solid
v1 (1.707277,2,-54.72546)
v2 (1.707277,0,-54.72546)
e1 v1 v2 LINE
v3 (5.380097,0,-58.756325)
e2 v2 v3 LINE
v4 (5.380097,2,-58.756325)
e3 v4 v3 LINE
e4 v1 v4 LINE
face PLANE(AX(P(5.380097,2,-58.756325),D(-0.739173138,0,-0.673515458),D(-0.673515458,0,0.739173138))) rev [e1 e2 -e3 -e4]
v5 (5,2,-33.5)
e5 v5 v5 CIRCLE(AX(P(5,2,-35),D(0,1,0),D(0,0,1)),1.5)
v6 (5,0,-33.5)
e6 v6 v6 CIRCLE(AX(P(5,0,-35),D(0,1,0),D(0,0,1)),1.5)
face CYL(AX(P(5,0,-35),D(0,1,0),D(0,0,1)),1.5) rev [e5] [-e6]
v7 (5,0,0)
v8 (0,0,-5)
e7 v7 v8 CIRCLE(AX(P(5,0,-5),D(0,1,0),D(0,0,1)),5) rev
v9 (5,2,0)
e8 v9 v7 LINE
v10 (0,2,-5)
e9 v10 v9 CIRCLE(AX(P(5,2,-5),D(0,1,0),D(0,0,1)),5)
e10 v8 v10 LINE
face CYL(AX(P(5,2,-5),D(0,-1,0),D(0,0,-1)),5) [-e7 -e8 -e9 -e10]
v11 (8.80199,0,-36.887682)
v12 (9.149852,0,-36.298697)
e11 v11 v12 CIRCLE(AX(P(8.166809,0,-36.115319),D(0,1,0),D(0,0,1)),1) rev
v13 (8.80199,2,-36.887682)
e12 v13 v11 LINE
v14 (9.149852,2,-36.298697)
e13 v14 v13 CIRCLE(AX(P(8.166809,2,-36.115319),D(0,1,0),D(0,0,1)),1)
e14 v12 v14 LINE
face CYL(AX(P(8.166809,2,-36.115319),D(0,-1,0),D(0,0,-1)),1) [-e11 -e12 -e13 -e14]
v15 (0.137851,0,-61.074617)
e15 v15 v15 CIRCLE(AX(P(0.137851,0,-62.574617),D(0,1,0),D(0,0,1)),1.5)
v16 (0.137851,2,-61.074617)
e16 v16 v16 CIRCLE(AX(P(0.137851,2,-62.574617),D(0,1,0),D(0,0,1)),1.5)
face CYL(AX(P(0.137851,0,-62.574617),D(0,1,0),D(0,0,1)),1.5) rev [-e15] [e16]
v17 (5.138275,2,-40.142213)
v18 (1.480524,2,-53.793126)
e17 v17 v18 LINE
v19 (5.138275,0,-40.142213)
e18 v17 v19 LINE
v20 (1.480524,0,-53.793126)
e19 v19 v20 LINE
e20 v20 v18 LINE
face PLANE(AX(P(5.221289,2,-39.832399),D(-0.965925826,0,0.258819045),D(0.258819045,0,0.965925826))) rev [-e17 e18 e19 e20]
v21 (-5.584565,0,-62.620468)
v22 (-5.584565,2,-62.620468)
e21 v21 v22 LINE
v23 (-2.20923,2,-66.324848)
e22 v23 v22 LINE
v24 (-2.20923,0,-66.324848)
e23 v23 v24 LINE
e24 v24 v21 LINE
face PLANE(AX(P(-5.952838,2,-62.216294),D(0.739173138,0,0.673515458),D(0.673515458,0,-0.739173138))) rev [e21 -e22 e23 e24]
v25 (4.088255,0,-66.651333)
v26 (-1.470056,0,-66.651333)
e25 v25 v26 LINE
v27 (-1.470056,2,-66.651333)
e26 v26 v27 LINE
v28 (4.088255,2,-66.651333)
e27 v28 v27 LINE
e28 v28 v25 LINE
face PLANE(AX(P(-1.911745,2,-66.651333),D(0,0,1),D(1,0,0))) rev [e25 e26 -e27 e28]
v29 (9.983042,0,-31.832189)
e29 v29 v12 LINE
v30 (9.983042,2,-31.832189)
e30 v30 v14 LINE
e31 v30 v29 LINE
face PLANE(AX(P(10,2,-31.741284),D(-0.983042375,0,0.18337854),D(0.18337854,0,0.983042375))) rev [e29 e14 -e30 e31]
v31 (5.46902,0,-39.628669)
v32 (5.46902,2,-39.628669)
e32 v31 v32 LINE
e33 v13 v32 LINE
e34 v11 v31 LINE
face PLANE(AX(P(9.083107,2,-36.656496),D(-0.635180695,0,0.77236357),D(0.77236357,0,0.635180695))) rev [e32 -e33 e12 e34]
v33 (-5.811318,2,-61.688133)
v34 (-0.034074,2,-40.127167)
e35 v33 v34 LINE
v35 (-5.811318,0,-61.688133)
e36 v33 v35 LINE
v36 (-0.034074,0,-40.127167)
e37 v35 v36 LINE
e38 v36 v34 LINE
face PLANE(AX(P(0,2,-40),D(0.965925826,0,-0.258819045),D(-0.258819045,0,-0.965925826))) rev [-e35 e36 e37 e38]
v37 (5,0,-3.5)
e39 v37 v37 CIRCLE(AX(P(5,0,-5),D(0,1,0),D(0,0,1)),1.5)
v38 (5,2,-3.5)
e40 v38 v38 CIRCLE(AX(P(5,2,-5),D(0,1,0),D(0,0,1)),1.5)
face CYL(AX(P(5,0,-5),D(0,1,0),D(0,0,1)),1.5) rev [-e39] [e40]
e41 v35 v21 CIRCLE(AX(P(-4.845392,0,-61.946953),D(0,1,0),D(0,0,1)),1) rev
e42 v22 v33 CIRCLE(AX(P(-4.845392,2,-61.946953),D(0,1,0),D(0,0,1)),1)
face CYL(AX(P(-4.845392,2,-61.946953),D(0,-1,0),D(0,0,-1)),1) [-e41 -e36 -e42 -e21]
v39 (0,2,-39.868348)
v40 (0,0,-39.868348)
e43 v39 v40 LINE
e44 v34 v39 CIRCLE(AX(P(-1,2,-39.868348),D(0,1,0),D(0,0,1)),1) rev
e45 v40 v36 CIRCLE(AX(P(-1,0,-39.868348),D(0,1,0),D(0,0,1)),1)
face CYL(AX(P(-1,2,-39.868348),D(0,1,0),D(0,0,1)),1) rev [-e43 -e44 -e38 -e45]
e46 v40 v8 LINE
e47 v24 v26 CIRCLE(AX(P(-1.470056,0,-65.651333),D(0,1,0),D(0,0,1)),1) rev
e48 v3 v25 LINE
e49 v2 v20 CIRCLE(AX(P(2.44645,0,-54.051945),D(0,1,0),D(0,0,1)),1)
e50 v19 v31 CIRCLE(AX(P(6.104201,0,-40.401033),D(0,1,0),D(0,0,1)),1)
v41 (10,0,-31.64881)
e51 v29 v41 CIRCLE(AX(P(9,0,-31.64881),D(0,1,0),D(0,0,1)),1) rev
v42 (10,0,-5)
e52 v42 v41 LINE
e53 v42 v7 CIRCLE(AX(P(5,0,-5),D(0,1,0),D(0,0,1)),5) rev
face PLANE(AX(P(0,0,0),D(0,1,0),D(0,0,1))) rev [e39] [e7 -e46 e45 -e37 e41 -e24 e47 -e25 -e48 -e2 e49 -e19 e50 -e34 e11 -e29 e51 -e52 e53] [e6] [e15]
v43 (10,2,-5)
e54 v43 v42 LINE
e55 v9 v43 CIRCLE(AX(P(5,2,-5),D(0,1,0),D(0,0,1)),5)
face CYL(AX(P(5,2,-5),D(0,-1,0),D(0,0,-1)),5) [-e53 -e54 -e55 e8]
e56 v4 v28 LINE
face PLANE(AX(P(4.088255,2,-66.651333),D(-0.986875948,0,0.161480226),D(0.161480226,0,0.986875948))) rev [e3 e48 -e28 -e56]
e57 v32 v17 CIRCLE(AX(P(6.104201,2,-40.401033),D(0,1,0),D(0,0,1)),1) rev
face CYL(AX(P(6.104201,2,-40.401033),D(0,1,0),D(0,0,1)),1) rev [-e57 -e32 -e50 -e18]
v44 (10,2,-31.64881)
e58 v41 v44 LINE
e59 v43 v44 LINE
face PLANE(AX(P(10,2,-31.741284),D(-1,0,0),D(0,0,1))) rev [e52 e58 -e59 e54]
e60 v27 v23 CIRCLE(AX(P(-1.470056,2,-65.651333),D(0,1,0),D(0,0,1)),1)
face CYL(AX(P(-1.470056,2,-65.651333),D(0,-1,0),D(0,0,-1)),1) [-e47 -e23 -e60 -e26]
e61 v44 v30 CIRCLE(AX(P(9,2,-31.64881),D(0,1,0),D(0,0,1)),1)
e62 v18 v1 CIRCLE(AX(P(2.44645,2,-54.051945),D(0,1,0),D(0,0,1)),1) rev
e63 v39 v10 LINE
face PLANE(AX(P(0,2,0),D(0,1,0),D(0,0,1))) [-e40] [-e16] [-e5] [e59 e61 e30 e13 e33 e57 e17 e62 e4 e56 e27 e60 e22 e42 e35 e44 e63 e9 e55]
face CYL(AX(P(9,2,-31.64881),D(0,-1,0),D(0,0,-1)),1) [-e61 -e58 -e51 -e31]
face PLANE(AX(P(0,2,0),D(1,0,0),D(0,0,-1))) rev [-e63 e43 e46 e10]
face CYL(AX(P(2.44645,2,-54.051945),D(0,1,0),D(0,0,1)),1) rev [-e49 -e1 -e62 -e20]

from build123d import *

# Parameters (mm, degrees)
BOSS_EXTRUDE1_DEPTH = 2
FILLET1_R           = 5
SKETCH2_R           = 1.5
CUT_EXTRUDE1_DEPTH  = 68.426998807
FILLET2_R           = 1


with BuildPart() as part:
    # Sketch1 → Boss-Extrude1 (new body)
    with BuildSketch(Plane(origin=(0, 0, 0), x_dir=(1, 0, 0), z_dir=(0, 1, 0))):
        Polygon((0, 0), (10, 0), (10, 31.741283677), (9.083107298, 36.656495551), (5.221289447, 39.832399027), (1.339003771, 54.321286421), (5.380096521, 58.756325247), (4.088254713, 66.65133283), (-1.911745287, 66.65133283), (-5.952838037, 62.216294005), (0, 40), align=None)
    extrude(amount=BOSS_EXTRUDE1_DEPTH)

    # Fillet1
    fillet1_edges = [part.edges().sort_by_distance(p)[0] for p in [
        (10, 1, 0),
        (0, 1, 0),
    ]]
    fillet(fillet1_edges, radius=FILLET1_R - 0.0001)  # a hair under: the kernel refuses the full size

    # Sketch2 → Cut-Extrude1 (cut, through all)
    with BuildSketch(Plane(origin=(0, 2, 0), x_dir=(1, 0, 0), z_dir=(0, 1, 0))):
        with Locations(Location((0.137851025, 62.574617084, 0), (0, 0, 270))):
            Circle(SKETCH2_R)
        with Locations(Location((5, 5, 0), (0, 0, 270))):
            Circle(SKETCH2_R)
        with Locations(Location((5, 35, 0), (0, 0, 270))):
            Circle(SKETCH2_R)
    extrude(amount=-CUT_EXTRUDE1_DEPTH, mode=Mode.SUBTRACT)

    # Fillet2
    fillet2_edges = [part.edges().sort_by_distance(p)[0] for p in [
        (9.083107298, 1, -36.656495551),
        (10, 1, -31.741283677),
        (0, 1, -40),
        (-5.952838037, 1, -62.216294005),
        (-1.911745287, 1, -66.65133283),
        (1.339003771, 1, -54.321286421),
        (5.221289447, 1, -39.832399027),
    ]]
    fillet(fillet2_edges, radius=FILLET2_R)


solid = part.part
